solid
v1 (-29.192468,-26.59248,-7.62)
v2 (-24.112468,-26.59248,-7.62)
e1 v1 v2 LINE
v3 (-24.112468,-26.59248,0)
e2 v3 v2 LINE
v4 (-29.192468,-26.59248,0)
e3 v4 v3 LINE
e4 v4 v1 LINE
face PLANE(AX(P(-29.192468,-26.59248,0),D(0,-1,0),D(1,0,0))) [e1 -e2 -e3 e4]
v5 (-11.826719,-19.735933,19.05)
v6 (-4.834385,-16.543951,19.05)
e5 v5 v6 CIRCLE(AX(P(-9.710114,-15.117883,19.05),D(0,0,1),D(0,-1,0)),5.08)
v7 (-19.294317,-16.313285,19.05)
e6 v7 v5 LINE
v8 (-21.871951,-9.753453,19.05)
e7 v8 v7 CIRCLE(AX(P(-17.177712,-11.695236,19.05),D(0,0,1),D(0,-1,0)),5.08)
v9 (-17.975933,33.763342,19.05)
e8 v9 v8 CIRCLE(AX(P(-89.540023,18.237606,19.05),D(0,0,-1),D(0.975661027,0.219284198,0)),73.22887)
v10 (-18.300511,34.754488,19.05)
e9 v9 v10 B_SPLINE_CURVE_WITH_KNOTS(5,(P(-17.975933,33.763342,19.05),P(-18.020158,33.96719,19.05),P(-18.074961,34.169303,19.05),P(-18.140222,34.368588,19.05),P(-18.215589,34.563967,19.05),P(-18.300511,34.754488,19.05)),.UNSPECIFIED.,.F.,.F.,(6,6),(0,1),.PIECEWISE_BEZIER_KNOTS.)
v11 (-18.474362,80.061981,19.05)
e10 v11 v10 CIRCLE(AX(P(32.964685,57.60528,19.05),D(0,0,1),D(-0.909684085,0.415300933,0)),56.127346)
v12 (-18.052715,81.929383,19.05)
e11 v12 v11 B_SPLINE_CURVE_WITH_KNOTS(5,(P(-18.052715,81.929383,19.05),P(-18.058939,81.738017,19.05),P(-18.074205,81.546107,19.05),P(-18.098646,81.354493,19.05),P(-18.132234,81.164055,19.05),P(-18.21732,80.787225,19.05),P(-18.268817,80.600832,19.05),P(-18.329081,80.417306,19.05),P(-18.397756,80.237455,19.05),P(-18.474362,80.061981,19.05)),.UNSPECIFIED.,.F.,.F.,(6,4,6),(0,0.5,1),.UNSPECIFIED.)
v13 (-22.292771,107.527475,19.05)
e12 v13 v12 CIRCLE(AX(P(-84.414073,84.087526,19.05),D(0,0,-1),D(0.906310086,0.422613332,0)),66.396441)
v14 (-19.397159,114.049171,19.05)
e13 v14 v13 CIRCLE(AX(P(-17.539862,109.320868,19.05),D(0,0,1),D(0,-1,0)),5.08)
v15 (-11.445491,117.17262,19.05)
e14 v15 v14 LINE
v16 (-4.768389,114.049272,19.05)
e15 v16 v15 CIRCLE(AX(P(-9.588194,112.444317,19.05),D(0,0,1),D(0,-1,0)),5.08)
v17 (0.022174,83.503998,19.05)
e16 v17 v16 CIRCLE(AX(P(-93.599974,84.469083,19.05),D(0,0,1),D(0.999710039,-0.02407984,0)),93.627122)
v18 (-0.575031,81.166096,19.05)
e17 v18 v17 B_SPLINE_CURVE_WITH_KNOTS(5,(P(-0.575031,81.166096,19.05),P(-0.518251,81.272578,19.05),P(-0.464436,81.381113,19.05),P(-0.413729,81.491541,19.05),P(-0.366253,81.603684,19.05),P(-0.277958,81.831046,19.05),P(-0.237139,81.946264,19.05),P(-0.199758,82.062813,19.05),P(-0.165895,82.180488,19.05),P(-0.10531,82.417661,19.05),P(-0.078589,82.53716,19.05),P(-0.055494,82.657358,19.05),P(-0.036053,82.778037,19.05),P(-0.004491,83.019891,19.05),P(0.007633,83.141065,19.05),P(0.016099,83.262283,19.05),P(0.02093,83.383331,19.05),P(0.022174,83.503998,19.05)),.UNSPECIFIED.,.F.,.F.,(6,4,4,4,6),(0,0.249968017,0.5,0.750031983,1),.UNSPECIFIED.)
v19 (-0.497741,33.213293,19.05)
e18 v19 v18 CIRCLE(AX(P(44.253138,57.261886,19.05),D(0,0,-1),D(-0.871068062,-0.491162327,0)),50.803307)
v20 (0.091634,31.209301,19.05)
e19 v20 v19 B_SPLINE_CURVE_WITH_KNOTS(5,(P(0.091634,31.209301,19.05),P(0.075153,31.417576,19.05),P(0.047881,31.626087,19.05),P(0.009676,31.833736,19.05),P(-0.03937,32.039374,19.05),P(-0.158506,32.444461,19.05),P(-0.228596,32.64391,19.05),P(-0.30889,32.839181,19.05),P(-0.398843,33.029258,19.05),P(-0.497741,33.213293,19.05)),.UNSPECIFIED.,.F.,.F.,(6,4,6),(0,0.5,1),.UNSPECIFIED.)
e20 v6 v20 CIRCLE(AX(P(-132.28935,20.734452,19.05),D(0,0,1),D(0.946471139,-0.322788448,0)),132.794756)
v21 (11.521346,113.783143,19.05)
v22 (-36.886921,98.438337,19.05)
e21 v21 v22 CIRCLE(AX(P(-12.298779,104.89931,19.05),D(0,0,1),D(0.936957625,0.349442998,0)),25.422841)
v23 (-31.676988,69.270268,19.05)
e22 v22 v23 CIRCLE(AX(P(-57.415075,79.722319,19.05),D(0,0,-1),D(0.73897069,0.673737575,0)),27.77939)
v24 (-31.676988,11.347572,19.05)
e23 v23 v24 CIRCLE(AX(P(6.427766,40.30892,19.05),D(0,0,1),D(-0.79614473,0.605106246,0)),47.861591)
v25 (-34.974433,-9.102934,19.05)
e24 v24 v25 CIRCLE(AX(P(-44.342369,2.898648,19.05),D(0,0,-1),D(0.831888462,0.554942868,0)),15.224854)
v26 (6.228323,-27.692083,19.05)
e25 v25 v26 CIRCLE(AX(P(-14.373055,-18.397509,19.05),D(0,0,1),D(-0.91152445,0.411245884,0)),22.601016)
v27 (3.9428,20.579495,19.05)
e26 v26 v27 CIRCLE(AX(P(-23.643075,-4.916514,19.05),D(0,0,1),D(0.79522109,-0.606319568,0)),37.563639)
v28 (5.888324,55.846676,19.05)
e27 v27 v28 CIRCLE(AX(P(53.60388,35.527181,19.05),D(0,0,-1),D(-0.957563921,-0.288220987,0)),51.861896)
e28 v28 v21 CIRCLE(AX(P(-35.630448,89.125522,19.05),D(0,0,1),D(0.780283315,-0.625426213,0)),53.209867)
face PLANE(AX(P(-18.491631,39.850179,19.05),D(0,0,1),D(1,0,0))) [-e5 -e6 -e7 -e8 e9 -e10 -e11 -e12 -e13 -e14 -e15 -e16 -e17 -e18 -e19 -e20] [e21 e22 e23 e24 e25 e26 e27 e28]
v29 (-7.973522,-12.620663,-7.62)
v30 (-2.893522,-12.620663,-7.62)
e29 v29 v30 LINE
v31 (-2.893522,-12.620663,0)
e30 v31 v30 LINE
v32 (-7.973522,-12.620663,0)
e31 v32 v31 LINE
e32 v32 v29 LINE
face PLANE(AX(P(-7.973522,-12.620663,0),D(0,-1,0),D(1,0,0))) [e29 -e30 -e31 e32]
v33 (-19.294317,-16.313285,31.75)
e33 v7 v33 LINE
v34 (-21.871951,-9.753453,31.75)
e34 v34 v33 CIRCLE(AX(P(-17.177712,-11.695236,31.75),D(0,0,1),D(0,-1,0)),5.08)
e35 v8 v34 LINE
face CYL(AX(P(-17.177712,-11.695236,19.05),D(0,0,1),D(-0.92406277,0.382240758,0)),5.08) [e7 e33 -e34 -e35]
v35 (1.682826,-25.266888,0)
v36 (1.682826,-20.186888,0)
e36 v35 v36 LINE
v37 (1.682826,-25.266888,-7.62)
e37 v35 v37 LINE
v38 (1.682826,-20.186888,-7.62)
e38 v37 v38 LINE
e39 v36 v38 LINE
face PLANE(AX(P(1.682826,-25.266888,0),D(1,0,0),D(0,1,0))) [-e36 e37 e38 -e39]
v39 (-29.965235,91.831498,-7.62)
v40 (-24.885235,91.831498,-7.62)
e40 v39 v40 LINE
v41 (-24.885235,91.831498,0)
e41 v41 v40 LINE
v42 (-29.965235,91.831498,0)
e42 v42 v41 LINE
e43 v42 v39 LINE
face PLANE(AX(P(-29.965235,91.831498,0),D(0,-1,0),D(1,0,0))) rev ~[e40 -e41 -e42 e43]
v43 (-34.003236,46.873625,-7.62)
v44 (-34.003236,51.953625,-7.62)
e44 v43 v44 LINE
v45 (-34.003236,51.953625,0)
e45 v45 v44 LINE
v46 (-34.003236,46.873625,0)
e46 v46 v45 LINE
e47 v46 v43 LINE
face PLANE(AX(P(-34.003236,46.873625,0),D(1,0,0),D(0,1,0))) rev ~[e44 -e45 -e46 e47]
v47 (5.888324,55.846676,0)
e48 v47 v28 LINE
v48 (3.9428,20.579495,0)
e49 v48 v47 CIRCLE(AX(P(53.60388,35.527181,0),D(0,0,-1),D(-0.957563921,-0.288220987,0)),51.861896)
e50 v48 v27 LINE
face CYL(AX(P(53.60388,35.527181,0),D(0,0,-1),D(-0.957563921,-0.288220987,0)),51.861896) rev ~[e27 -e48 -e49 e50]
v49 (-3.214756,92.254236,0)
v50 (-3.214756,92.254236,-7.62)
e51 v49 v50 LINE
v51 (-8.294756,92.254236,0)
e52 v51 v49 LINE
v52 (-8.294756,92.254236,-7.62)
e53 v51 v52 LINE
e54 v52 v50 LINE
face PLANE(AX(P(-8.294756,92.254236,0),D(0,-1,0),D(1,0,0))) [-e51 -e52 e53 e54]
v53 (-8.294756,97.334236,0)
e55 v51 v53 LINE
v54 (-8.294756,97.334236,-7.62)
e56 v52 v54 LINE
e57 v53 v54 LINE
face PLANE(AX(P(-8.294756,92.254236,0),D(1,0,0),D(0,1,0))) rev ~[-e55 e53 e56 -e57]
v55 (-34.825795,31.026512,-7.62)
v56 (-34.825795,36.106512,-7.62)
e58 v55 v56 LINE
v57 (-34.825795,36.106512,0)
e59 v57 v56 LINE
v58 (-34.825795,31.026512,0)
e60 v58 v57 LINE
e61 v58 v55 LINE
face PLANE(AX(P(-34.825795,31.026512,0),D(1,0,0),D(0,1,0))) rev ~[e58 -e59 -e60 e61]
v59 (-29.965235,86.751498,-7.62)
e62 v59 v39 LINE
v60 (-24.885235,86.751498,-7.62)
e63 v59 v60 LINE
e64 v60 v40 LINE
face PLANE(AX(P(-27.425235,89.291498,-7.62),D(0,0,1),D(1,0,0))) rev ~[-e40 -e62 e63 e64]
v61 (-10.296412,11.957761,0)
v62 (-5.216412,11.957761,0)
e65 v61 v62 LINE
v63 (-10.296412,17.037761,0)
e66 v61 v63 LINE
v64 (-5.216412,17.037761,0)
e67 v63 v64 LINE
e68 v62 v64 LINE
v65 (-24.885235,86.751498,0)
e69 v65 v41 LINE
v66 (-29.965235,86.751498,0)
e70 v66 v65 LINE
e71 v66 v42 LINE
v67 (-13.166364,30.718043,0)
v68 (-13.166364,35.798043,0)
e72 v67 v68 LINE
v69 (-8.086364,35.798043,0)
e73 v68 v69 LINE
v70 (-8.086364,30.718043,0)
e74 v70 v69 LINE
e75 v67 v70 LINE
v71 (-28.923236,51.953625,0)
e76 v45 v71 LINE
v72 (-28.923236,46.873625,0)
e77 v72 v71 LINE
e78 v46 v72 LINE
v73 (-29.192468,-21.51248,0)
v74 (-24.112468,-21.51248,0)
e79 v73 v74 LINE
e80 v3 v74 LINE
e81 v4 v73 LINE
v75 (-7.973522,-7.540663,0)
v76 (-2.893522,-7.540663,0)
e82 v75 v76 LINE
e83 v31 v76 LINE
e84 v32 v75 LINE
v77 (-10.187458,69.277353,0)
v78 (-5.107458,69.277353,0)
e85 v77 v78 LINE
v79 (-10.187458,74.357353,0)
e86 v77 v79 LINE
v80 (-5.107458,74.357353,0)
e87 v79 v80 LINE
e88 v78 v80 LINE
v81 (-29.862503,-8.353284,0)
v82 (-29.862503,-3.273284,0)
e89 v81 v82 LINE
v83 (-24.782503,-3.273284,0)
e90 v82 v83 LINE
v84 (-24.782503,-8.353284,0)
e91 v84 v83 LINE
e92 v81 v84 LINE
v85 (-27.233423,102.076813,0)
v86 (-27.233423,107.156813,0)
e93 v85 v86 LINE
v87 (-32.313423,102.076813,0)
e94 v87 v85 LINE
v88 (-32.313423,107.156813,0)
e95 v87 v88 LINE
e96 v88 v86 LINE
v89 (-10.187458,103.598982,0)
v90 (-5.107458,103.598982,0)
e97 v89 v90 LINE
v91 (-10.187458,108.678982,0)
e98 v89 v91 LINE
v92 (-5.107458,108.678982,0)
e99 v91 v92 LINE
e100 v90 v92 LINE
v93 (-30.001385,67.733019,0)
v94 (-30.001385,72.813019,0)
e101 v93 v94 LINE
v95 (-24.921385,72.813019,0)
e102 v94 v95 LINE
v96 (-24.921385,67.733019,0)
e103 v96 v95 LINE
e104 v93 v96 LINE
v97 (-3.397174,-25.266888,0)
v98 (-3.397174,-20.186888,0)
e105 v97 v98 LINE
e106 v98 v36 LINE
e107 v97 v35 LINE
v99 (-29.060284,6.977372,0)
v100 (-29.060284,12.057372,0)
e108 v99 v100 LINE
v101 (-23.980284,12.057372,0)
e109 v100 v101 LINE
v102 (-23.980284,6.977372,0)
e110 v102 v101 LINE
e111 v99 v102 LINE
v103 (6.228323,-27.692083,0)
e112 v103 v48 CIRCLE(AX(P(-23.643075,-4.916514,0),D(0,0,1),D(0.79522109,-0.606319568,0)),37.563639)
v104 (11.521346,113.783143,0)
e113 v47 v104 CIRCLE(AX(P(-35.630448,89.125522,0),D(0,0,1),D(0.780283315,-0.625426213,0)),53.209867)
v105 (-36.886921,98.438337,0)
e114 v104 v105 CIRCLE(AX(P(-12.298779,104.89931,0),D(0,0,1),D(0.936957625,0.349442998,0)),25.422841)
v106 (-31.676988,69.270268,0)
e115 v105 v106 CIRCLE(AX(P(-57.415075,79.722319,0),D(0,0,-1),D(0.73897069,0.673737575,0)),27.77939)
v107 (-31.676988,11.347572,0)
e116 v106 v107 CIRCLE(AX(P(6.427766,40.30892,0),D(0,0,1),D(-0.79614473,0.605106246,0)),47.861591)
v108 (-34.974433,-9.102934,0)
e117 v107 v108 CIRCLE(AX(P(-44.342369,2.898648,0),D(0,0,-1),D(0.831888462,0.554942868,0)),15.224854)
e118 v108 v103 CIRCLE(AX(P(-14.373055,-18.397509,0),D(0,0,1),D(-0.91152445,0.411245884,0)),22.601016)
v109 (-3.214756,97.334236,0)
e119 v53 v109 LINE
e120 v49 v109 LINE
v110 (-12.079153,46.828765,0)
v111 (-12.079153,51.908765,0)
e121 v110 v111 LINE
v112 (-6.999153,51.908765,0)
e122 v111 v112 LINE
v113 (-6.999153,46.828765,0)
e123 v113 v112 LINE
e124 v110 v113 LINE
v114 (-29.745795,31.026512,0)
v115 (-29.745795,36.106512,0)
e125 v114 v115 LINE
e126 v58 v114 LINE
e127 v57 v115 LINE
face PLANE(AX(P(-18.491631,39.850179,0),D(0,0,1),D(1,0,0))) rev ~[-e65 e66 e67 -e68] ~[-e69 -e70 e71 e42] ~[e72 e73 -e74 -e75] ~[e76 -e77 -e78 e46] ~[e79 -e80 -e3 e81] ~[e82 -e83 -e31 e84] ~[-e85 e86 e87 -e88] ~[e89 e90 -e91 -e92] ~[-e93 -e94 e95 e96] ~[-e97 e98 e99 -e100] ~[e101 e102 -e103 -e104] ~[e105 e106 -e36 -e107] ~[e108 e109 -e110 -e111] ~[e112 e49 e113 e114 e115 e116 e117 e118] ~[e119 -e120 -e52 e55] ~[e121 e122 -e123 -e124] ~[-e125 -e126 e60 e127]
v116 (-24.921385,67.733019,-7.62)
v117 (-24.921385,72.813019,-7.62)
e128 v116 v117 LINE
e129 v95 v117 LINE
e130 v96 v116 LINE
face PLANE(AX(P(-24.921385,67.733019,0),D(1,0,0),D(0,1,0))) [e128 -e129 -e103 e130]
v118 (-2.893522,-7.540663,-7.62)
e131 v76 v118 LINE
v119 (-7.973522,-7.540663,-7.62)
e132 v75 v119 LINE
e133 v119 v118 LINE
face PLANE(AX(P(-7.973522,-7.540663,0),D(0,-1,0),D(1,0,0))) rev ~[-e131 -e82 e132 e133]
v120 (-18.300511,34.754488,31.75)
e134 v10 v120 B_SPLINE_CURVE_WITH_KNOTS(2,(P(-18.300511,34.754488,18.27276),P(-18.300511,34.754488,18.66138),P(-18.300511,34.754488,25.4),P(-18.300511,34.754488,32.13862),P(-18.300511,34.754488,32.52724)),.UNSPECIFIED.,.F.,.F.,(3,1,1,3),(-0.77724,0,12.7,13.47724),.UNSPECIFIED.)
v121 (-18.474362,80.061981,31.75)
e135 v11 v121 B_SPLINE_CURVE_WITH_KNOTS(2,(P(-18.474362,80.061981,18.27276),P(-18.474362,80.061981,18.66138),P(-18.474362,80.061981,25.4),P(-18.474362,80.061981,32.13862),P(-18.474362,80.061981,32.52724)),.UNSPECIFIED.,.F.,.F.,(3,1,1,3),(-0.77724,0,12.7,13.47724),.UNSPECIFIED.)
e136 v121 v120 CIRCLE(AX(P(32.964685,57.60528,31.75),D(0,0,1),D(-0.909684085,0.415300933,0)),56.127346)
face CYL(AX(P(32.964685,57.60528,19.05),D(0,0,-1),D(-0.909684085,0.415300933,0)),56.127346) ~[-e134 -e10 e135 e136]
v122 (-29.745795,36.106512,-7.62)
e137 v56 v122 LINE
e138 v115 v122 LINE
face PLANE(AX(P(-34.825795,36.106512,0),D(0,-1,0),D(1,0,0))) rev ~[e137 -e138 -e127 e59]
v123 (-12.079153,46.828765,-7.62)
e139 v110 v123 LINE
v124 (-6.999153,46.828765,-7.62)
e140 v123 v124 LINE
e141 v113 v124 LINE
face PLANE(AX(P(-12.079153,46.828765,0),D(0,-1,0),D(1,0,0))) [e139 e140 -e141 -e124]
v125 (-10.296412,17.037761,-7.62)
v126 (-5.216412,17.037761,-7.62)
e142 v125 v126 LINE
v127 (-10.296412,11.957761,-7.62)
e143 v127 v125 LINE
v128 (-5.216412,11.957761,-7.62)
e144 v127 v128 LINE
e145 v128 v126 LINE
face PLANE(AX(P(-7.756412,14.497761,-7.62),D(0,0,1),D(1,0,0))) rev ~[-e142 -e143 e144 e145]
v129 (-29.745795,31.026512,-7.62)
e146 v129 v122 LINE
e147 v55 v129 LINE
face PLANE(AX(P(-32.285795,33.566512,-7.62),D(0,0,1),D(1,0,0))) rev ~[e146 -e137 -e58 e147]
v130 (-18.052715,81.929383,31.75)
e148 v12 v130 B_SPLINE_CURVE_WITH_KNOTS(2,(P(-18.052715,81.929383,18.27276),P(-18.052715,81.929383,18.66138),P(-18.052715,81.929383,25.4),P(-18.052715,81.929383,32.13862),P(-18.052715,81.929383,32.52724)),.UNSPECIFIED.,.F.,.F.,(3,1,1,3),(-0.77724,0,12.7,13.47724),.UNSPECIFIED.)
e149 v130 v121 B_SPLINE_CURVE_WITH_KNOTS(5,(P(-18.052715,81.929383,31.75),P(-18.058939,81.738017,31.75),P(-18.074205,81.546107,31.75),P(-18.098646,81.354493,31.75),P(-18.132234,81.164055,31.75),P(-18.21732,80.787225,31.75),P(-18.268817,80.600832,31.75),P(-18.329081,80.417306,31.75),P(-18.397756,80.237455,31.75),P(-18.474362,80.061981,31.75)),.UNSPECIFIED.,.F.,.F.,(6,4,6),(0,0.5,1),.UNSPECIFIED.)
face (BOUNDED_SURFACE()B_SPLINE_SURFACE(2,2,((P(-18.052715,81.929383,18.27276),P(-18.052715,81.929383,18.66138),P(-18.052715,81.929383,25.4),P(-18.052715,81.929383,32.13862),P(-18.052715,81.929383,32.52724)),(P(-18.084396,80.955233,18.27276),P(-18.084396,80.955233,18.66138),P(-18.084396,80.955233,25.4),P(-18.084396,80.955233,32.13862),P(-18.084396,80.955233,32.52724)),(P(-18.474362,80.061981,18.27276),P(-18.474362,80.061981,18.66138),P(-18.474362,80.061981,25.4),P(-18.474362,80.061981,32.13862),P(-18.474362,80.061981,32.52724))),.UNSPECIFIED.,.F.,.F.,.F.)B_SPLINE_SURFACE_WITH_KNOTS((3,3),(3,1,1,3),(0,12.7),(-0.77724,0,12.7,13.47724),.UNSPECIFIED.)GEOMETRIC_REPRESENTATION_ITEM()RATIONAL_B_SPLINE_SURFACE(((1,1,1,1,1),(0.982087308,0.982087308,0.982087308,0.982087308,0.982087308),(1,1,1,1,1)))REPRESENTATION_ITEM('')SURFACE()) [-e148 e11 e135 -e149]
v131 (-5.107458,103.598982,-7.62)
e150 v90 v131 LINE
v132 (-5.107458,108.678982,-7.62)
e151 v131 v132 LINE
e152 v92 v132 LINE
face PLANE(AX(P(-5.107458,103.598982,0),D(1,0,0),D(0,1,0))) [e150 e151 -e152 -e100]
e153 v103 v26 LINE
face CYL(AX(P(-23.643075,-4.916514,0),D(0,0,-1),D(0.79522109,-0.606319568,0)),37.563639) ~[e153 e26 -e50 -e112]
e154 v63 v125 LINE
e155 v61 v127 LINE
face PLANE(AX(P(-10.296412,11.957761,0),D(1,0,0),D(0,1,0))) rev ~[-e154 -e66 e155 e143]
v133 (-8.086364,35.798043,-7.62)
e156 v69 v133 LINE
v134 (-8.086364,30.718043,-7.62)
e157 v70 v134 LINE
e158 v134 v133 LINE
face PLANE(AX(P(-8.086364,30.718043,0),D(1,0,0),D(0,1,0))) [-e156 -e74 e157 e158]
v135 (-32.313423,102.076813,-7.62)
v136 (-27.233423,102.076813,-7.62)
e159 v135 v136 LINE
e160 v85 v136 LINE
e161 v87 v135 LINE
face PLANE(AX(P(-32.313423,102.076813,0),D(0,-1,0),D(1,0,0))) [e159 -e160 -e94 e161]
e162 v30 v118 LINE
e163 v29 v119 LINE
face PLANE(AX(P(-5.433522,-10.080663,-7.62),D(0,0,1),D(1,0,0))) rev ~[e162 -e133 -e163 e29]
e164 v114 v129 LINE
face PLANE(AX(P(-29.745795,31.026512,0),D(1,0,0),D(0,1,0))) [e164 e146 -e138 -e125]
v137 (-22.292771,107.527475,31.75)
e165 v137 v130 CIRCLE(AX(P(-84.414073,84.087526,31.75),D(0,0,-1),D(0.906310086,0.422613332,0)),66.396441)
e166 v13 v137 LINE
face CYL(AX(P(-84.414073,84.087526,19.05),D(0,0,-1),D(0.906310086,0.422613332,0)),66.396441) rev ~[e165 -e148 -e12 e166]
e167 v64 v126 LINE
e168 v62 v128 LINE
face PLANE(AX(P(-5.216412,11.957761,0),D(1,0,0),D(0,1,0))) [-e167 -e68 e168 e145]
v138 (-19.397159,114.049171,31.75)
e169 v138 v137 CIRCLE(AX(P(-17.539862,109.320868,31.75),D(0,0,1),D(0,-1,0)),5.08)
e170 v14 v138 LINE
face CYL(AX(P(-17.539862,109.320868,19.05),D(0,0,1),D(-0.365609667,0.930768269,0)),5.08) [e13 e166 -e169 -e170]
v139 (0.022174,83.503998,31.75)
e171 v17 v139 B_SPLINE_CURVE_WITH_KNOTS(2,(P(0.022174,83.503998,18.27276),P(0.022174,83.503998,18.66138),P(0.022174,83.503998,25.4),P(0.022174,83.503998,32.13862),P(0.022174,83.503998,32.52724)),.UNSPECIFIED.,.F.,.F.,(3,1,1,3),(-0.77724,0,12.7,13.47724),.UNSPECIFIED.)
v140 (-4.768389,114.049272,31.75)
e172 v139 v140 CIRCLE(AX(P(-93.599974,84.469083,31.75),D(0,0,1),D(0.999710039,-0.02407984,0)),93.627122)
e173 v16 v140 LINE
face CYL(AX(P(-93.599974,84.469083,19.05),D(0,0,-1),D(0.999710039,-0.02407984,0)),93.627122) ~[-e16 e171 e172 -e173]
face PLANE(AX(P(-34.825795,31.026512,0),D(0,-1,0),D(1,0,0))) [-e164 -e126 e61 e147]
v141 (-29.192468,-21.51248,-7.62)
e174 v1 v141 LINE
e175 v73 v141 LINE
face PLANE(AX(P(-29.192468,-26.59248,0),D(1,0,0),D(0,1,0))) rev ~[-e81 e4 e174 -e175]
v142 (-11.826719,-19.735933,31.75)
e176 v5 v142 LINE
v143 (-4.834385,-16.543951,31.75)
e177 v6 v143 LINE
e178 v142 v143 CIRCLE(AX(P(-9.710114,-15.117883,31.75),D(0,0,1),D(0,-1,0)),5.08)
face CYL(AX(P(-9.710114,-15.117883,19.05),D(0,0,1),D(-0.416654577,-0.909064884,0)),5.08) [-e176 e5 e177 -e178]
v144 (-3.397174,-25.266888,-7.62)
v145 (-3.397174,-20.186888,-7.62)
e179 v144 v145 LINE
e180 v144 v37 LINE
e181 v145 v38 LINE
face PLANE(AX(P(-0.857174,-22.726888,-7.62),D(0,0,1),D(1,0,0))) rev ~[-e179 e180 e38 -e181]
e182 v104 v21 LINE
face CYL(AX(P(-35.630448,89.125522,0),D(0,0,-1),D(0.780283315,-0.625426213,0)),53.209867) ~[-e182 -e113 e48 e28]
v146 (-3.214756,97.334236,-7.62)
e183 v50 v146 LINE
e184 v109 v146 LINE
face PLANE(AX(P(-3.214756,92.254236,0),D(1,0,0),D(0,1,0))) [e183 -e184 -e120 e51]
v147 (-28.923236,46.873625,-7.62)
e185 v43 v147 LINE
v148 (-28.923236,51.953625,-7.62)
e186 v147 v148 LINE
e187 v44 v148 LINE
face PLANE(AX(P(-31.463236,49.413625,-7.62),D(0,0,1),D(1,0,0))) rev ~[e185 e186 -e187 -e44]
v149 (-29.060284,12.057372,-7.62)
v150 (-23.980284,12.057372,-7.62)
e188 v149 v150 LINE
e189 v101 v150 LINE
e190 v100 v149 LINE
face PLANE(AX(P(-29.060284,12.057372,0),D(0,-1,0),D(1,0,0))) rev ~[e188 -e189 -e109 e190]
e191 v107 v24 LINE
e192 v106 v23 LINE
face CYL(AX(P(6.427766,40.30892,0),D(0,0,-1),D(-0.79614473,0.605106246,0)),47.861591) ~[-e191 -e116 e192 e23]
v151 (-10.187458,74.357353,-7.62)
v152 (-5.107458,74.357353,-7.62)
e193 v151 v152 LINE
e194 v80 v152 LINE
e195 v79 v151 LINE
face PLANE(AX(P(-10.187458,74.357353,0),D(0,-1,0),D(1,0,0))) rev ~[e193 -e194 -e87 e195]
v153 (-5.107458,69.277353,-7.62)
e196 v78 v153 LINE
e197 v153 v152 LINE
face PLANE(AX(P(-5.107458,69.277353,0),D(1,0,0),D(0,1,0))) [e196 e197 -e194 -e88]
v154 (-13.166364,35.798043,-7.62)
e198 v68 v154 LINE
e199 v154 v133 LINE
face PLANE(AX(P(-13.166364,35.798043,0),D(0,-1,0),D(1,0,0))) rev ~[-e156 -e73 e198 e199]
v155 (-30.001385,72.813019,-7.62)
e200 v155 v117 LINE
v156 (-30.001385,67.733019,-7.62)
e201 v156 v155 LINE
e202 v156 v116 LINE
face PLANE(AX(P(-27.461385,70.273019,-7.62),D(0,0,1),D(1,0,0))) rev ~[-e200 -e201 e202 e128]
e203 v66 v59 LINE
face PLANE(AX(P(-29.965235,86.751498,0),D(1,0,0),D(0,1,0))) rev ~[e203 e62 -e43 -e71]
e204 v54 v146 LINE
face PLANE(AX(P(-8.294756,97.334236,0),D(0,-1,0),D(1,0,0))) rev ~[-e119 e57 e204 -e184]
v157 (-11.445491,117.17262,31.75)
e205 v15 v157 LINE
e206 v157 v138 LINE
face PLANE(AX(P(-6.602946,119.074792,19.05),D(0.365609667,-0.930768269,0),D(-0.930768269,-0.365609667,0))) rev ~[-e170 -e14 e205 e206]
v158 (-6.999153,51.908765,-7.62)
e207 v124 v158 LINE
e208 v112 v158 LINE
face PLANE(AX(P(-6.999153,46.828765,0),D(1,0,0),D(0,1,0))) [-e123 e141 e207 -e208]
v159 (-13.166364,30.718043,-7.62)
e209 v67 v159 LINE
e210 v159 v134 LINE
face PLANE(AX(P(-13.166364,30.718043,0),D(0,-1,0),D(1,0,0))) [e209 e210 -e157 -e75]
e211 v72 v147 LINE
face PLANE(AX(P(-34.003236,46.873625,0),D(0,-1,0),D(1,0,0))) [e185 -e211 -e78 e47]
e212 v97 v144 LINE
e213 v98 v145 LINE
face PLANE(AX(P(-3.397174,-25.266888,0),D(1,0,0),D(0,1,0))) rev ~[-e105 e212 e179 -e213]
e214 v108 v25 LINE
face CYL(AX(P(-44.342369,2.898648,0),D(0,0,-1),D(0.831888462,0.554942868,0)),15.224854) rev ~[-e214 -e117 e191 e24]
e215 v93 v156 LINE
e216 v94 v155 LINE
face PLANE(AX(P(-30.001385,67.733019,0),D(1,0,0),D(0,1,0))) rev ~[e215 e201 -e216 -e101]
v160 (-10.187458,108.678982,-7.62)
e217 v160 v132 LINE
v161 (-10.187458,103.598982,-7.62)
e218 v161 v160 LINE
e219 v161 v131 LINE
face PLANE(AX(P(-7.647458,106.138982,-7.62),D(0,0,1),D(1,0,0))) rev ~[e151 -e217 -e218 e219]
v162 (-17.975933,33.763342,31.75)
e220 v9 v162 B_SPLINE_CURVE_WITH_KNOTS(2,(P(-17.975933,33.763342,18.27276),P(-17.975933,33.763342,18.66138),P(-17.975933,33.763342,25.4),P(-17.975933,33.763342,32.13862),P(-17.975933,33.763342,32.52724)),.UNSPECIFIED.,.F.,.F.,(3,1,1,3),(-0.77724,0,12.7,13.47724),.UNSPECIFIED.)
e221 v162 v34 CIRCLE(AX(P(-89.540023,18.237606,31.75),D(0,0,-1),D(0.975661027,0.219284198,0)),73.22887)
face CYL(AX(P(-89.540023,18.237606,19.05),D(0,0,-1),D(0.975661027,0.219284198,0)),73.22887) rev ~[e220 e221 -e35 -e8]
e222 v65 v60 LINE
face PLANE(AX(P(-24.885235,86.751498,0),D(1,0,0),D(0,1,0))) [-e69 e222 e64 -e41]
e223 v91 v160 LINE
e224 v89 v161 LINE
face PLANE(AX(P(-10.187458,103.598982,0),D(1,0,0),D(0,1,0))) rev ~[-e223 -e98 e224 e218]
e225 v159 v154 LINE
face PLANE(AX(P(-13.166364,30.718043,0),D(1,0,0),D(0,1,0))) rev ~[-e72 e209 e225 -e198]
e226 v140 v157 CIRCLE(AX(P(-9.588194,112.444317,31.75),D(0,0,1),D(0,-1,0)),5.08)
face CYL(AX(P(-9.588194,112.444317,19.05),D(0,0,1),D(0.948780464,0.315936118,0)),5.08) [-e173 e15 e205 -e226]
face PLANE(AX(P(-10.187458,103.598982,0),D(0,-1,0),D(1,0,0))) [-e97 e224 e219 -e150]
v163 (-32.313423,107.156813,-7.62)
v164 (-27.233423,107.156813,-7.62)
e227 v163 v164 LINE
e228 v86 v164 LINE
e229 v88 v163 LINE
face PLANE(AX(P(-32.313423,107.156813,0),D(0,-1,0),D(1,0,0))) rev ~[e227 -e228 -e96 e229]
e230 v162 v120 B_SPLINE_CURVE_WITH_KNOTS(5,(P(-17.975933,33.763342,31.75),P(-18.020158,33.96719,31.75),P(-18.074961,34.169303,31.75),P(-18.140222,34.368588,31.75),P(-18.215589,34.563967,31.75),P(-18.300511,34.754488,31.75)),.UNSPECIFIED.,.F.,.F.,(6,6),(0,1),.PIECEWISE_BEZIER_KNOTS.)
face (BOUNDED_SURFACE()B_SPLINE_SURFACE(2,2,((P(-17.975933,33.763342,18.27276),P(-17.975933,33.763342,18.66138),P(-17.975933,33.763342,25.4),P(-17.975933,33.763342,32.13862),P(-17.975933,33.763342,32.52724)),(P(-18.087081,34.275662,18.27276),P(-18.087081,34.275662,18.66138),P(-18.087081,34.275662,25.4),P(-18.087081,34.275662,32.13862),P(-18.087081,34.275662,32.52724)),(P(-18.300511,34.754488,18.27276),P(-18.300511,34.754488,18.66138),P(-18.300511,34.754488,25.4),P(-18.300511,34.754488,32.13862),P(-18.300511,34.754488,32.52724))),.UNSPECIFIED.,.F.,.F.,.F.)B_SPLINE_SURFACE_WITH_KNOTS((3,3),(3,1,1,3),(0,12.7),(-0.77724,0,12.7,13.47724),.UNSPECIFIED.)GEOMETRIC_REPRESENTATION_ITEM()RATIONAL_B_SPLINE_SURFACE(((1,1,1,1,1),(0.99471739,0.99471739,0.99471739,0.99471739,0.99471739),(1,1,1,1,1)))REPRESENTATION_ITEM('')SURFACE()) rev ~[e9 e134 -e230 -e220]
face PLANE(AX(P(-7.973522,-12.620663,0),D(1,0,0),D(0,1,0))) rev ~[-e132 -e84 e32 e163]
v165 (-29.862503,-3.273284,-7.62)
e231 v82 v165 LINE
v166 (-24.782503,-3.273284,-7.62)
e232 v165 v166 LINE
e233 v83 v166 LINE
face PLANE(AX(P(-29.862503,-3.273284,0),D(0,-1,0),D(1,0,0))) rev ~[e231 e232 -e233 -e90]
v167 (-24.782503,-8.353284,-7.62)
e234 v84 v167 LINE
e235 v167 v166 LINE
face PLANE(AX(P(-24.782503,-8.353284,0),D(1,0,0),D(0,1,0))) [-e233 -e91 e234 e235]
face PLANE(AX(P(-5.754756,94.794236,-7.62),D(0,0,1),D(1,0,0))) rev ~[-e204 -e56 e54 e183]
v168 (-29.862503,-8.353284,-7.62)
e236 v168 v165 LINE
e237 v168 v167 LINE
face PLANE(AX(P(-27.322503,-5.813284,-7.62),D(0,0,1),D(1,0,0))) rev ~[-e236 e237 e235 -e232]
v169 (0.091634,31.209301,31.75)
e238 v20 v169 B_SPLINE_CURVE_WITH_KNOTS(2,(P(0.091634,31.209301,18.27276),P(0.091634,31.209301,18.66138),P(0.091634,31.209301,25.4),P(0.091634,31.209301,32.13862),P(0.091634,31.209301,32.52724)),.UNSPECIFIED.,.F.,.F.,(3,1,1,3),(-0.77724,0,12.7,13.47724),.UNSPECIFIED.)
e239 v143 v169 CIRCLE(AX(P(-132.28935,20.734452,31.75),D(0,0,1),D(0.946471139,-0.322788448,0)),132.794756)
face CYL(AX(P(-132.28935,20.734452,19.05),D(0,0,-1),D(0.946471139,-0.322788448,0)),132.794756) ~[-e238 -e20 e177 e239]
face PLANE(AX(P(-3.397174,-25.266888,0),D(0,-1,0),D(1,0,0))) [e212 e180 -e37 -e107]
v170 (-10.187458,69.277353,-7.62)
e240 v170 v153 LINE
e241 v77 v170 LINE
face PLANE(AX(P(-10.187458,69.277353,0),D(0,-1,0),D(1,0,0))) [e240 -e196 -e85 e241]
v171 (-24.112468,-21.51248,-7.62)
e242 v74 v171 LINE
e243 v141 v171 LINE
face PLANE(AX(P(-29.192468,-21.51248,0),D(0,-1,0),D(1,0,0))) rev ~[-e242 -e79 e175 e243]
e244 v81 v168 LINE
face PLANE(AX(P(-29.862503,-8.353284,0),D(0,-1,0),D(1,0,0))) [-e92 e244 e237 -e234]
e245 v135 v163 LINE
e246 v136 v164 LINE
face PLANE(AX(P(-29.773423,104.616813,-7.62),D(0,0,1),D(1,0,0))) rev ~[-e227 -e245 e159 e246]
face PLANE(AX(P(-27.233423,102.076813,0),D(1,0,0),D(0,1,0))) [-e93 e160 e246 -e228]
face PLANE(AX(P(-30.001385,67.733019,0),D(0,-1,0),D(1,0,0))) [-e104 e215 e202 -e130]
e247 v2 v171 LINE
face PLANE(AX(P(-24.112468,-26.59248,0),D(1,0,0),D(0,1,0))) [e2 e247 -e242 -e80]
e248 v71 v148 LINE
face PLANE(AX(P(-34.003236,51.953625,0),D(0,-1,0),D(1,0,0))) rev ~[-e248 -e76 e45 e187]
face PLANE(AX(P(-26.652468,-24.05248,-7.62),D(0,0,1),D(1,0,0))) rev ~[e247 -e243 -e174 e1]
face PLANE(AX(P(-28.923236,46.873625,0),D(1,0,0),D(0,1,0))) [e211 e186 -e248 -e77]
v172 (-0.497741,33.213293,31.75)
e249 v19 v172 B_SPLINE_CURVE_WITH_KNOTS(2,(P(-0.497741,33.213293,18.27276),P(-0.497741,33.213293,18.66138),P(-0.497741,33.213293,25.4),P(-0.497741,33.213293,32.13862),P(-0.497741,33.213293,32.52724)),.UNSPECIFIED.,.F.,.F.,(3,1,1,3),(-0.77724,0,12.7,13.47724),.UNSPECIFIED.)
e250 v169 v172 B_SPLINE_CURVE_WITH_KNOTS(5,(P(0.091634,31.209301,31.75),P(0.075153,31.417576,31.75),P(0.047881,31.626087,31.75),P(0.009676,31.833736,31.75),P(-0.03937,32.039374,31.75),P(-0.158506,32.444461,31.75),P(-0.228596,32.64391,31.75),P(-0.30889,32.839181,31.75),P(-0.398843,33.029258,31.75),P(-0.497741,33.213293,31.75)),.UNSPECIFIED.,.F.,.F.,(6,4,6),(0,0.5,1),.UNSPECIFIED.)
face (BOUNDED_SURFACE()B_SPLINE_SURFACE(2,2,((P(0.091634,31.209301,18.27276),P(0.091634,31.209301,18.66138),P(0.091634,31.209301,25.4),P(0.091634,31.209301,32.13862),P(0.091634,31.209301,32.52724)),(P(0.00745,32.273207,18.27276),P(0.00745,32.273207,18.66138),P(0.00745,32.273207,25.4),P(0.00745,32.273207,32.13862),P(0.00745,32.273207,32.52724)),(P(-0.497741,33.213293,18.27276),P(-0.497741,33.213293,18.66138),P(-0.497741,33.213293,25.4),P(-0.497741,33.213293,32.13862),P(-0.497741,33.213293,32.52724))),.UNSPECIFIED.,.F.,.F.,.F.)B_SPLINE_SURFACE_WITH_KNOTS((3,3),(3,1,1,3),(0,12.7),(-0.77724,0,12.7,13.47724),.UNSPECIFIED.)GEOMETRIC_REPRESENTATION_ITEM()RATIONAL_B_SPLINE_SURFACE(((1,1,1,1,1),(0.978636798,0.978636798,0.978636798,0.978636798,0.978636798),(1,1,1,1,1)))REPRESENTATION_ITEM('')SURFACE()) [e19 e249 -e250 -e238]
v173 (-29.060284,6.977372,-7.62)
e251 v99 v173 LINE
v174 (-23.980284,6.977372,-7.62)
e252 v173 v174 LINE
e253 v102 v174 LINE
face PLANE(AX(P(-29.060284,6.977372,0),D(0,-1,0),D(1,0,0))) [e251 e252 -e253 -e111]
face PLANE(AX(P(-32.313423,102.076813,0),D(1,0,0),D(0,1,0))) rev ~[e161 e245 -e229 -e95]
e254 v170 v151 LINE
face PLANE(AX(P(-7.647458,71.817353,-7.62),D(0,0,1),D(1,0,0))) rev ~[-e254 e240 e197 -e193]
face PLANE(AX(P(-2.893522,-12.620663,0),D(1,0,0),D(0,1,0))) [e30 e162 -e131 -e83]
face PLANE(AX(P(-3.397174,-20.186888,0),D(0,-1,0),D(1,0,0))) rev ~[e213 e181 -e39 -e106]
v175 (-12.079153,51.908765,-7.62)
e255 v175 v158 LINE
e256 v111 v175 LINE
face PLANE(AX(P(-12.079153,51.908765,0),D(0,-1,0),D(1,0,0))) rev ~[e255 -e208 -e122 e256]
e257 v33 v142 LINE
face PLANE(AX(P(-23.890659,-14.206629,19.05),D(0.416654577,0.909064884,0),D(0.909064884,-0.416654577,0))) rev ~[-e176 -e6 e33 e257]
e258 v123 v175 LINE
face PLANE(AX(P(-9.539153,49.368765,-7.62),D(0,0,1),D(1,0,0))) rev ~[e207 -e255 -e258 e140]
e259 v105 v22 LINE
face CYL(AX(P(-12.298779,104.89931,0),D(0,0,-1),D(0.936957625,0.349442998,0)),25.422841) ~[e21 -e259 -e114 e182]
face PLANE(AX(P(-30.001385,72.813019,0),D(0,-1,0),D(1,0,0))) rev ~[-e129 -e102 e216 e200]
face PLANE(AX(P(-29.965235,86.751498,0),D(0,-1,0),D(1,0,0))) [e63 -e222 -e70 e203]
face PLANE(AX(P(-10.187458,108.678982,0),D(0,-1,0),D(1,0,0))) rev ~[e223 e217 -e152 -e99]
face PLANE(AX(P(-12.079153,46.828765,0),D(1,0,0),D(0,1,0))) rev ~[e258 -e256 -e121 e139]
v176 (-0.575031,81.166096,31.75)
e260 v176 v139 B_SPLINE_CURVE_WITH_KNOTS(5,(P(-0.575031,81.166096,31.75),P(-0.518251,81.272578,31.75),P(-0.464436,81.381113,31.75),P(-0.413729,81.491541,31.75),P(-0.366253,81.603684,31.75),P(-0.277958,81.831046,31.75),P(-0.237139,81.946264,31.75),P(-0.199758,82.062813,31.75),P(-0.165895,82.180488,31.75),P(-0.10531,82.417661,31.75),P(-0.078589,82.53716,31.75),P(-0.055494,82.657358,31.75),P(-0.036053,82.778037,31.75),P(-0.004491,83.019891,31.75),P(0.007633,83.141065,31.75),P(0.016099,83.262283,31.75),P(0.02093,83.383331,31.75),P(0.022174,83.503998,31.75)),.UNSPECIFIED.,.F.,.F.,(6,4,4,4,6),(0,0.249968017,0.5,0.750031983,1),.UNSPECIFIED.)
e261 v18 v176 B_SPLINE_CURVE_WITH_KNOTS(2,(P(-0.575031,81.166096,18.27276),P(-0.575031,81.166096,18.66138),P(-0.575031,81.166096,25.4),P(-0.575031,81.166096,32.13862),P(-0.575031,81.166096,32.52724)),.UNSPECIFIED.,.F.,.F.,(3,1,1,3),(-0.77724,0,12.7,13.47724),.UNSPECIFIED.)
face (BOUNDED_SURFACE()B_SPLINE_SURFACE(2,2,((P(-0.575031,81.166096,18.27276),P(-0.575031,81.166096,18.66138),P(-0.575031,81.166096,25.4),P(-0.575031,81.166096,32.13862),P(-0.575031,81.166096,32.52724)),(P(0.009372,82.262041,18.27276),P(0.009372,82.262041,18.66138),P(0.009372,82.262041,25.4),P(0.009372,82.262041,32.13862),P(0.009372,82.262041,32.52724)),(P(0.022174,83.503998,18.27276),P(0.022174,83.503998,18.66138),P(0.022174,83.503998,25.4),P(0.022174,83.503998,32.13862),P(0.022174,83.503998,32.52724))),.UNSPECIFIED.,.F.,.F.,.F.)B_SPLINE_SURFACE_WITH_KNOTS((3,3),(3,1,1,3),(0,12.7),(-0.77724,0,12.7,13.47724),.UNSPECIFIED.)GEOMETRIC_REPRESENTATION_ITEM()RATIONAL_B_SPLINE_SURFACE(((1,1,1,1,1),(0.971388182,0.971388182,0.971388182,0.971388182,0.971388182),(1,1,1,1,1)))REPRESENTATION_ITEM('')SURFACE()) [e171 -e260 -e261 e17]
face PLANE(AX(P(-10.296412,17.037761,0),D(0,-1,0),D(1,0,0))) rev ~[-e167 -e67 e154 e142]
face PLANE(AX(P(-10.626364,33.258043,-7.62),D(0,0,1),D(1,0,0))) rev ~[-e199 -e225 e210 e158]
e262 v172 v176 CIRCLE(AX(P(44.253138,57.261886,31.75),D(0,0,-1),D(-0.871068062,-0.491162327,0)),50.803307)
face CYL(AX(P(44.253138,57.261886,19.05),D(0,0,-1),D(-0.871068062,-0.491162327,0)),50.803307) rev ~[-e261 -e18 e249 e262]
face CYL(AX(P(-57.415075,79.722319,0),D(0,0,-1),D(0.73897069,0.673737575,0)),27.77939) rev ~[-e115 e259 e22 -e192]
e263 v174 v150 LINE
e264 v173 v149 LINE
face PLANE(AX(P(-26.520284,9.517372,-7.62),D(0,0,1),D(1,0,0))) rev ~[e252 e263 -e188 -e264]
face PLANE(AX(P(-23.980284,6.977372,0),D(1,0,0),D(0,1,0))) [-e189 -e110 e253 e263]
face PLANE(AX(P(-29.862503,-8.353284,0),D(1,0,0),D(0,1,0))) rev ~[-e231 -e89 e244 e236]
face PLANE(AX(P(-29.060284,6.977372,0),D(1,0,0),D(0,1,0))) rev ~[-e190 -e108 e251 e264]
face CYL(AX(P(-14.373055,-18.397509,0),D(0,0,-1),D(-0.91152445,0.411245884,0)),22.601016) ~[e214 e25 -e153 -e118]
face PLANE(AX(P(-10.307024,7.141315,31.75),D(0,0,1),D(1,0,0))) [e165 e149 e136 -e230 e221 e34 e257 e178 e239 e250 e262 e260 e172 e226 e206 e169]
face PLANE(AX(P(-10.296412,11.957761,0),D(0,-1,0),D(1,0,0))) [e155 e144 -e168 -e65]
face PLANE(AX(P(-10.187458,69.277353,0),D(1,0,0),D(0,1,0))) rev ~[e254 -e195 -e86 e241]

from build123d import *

# Parameters (mm, degrees)
F1_DEPTH = 19.05
F3_DEPTH = 12.7
F4_R     = 5.08
F5_W     = 5.08
F5_H     = 5.08
F6_DEPTH = 7.62


# Not quite as in the source:
# - a feature names something its author has since deleted; it is built from what else it names


with BuildPart() as f1:
    # F0 (on Top) → F1 (new body)
    with BuildSketch(Plane.XY):
        with BuildLine():
            ThreePointArc((-31.6769881083, 69.2702680826), (-41.4338257439, 40.3089202009), (-31.6769881083, 11.3475723192))
            Line((-31.6769881083, 11.3475723192), (3.9428002201, 20.5794945359))
            ThreePointArc((3.9428002201, 20.5794945359), (1.8207183061, 38.3838132659), (5.8883237652, 55.8466762304))
            Line((5.8883237652, 55.8466762304), (-31.6769881083, 69.2702680826))
        make_face()
        with BuildLine():
            ThreePointArc((-36.8869205419, 98.4383374453), (-30.0684968554, 84.6069006975), (-31.6769881083, 69.2702680826))
            Line((-31.6769881083, 69.2702680826), (5.8883237652, 55.8466762304))
            ThreePointArc((5.8883237652, 55.8466762304), (17.3296867389, 83.976336418), (11.5213459358, 113.7831434608))
            Line((11.5213459358, 113.7831434608), (-36.8869205419, 98.4383374453))
        make_face()
        with BuildLine():
            ThreePointArc((-31.6769881083, 11.3475723192), (-29.3116483225, 0.4750905822), (-34.9744334817, -9.1029340401))
            Line((-34.9744334817, -9.1029340401), (6.2283230945, -27.6920832694))
            ThreePointArc((6.2283230945, -27.6920832694), (13.878530495, -3.1399721265), (3.9428002201, 20.5794945359))
            Line((3.9428002201, 20.5794945359), (-31.6769881083, 11.3475723192))
        make_face()
        with BuildLine():
            Line((6.2283230945, -27.6920832694), (-34.9744334817, -9.1029340401))
            ThreePointArc((-34.9744334817, -9.1029340401), (-23.6676298082, -38.9988869429), (6.2283230945, -27.6920832694))
        make_face()
        with BuildLine():
            ThreePointArc((11.5213459358, 113.7831434608), (-19.9807860054, 129.1337402603), (-36.8869205419, 98.4383374453))
            Line((-36.8869205419, 98.4383374453), (11.5213459358, 113.7831434608))
        make_face()
    extrude(amount=F1_DEPTH)

    # F2 (on face) → F3 (join)
    with BuildSketch(Plane.XY.offset(19.05)):
        with BuildLine():
            ThreePointArc((-18.0934686214, 34.295540303), (-16.8286909738, 9.5468310574), (-23.8906592131, -14.2066292465))
            Line((-23.8906592131, -14.2066292465), (-6.6029457375, -22.1301615238))
            ThreePointArc((-6.6029457375, -22.1301615238), (-0.4607343944, 4.7449741554), (0, 32.3092155159))
            Line((0, 32.3092155159), (-18.0934686214, 34.295540303))
        make_face()
        with BuildLine():
            ThreePointArc((-18.0934686214, 80.9150189161), (-23.162661248, 57.6052796096), (-18.0934686214, 34.295540303))
            Line((-18.0934686214, 34.295540303), (0, 32.3092155159))
            ThreePointArc((0, 32.3092155159), (-6.5501688565, 57.2618860751), (0, 82.2145566344))
            ThreePointArc((0, 82.2145566344), (-1.439849547, 100.9781554163), (-6.6029457375, 119.0747916698))
            Line((-6.6029457375, 119.0747916698), (-24.2383088917, 112.1475473046))
            ThreePointArc((-24.2383088917, 112.1475473046), (-19.2665441206, 96.9049694563), (-18.0934686214, 80.9150189161))
        make_face()
    extrude(amount=F3_DEPTH)

    # F4
    f4_edges = [f1.edges().sort_by_distance(p)[0] for p in [
        (-23.890659, -14.206629, 25.4),
        (-6.602946, -22.130162, 25.4),
        (-6.602946, 119.074792, 25.4),
        (-24.238309, 112.147547, 25.4),
        (0, 82.214557, 25.4),
        (0, 32.309216, 25.4),
        (-18.093469, 80.915019, 25.4),
        (-18.093469, 34.29554, 25.4),
    ]]
    fillet(f4_edges, radius=F4_R)

    # F5 (on Top) → F6 (join)
    with BuildSketch(Plane.XY):
        with Locations((-26.6524679592, -24.0524802357)):
            Rectangle(F5_W, F5_H)
        with Locations((-0.8571739626, -22.7268876201)):
            Rectangle(F5_W, F5_H)
        with Locations((-27.3225028068, -5.8132838458)):
            Rectangle(F5_W, F5_H)
        with Locations((-5.4335221648, -10.0806634873)):
            Rectangle(F5_W, F5_H)
        with Locations((-26.5202838928, 9.5173716545)):
            Rectangle(F5_W, F5_H)
        with Locations((-7.7564124949, 14.4977606833)):
            Rectangle(F5_W, F5_H)
        with Locations((-32.2857946157, 33.5665121675)):
            Rectangle(F5_W, F5_H)
        with Locations((-10.6263644993, 33.2580432296)):
            Rectangle(F5_W, F5_H)
        with Locations((-31.4632356167, 49.4136251509)):
            Rectangle(F5_W, F5_H)
        with Locations((-9.5391534269, 49.3687652051)):
            Rectangle(F5_W, F5_H)
        with Locations((-27.4613853544, 70.2730193734)):
            Rectangle(F5_W, F5_H)
        with Locations((-7.6474579982, 71.8173533678)):
            Rectangle(F5_W, F5_H)
        with Locations((-27.4252351373, 89.291498065)):
            Rectangle(F5_W, F5_H)
        with Locations((-5.7547562756, 94.7942361236)):
            Rectangle(F5_W, F5_H)
        with Locations((-29.7734234482, 104.6168133616)):
            Rectangle(F5_W, F5_H)
        with Locations((-7.6474579982, 106.1389820957)):
            Rectangle(F5_W, F5_H)
    extrude(amount=-F6_DEPTH)


solid = f1.part
